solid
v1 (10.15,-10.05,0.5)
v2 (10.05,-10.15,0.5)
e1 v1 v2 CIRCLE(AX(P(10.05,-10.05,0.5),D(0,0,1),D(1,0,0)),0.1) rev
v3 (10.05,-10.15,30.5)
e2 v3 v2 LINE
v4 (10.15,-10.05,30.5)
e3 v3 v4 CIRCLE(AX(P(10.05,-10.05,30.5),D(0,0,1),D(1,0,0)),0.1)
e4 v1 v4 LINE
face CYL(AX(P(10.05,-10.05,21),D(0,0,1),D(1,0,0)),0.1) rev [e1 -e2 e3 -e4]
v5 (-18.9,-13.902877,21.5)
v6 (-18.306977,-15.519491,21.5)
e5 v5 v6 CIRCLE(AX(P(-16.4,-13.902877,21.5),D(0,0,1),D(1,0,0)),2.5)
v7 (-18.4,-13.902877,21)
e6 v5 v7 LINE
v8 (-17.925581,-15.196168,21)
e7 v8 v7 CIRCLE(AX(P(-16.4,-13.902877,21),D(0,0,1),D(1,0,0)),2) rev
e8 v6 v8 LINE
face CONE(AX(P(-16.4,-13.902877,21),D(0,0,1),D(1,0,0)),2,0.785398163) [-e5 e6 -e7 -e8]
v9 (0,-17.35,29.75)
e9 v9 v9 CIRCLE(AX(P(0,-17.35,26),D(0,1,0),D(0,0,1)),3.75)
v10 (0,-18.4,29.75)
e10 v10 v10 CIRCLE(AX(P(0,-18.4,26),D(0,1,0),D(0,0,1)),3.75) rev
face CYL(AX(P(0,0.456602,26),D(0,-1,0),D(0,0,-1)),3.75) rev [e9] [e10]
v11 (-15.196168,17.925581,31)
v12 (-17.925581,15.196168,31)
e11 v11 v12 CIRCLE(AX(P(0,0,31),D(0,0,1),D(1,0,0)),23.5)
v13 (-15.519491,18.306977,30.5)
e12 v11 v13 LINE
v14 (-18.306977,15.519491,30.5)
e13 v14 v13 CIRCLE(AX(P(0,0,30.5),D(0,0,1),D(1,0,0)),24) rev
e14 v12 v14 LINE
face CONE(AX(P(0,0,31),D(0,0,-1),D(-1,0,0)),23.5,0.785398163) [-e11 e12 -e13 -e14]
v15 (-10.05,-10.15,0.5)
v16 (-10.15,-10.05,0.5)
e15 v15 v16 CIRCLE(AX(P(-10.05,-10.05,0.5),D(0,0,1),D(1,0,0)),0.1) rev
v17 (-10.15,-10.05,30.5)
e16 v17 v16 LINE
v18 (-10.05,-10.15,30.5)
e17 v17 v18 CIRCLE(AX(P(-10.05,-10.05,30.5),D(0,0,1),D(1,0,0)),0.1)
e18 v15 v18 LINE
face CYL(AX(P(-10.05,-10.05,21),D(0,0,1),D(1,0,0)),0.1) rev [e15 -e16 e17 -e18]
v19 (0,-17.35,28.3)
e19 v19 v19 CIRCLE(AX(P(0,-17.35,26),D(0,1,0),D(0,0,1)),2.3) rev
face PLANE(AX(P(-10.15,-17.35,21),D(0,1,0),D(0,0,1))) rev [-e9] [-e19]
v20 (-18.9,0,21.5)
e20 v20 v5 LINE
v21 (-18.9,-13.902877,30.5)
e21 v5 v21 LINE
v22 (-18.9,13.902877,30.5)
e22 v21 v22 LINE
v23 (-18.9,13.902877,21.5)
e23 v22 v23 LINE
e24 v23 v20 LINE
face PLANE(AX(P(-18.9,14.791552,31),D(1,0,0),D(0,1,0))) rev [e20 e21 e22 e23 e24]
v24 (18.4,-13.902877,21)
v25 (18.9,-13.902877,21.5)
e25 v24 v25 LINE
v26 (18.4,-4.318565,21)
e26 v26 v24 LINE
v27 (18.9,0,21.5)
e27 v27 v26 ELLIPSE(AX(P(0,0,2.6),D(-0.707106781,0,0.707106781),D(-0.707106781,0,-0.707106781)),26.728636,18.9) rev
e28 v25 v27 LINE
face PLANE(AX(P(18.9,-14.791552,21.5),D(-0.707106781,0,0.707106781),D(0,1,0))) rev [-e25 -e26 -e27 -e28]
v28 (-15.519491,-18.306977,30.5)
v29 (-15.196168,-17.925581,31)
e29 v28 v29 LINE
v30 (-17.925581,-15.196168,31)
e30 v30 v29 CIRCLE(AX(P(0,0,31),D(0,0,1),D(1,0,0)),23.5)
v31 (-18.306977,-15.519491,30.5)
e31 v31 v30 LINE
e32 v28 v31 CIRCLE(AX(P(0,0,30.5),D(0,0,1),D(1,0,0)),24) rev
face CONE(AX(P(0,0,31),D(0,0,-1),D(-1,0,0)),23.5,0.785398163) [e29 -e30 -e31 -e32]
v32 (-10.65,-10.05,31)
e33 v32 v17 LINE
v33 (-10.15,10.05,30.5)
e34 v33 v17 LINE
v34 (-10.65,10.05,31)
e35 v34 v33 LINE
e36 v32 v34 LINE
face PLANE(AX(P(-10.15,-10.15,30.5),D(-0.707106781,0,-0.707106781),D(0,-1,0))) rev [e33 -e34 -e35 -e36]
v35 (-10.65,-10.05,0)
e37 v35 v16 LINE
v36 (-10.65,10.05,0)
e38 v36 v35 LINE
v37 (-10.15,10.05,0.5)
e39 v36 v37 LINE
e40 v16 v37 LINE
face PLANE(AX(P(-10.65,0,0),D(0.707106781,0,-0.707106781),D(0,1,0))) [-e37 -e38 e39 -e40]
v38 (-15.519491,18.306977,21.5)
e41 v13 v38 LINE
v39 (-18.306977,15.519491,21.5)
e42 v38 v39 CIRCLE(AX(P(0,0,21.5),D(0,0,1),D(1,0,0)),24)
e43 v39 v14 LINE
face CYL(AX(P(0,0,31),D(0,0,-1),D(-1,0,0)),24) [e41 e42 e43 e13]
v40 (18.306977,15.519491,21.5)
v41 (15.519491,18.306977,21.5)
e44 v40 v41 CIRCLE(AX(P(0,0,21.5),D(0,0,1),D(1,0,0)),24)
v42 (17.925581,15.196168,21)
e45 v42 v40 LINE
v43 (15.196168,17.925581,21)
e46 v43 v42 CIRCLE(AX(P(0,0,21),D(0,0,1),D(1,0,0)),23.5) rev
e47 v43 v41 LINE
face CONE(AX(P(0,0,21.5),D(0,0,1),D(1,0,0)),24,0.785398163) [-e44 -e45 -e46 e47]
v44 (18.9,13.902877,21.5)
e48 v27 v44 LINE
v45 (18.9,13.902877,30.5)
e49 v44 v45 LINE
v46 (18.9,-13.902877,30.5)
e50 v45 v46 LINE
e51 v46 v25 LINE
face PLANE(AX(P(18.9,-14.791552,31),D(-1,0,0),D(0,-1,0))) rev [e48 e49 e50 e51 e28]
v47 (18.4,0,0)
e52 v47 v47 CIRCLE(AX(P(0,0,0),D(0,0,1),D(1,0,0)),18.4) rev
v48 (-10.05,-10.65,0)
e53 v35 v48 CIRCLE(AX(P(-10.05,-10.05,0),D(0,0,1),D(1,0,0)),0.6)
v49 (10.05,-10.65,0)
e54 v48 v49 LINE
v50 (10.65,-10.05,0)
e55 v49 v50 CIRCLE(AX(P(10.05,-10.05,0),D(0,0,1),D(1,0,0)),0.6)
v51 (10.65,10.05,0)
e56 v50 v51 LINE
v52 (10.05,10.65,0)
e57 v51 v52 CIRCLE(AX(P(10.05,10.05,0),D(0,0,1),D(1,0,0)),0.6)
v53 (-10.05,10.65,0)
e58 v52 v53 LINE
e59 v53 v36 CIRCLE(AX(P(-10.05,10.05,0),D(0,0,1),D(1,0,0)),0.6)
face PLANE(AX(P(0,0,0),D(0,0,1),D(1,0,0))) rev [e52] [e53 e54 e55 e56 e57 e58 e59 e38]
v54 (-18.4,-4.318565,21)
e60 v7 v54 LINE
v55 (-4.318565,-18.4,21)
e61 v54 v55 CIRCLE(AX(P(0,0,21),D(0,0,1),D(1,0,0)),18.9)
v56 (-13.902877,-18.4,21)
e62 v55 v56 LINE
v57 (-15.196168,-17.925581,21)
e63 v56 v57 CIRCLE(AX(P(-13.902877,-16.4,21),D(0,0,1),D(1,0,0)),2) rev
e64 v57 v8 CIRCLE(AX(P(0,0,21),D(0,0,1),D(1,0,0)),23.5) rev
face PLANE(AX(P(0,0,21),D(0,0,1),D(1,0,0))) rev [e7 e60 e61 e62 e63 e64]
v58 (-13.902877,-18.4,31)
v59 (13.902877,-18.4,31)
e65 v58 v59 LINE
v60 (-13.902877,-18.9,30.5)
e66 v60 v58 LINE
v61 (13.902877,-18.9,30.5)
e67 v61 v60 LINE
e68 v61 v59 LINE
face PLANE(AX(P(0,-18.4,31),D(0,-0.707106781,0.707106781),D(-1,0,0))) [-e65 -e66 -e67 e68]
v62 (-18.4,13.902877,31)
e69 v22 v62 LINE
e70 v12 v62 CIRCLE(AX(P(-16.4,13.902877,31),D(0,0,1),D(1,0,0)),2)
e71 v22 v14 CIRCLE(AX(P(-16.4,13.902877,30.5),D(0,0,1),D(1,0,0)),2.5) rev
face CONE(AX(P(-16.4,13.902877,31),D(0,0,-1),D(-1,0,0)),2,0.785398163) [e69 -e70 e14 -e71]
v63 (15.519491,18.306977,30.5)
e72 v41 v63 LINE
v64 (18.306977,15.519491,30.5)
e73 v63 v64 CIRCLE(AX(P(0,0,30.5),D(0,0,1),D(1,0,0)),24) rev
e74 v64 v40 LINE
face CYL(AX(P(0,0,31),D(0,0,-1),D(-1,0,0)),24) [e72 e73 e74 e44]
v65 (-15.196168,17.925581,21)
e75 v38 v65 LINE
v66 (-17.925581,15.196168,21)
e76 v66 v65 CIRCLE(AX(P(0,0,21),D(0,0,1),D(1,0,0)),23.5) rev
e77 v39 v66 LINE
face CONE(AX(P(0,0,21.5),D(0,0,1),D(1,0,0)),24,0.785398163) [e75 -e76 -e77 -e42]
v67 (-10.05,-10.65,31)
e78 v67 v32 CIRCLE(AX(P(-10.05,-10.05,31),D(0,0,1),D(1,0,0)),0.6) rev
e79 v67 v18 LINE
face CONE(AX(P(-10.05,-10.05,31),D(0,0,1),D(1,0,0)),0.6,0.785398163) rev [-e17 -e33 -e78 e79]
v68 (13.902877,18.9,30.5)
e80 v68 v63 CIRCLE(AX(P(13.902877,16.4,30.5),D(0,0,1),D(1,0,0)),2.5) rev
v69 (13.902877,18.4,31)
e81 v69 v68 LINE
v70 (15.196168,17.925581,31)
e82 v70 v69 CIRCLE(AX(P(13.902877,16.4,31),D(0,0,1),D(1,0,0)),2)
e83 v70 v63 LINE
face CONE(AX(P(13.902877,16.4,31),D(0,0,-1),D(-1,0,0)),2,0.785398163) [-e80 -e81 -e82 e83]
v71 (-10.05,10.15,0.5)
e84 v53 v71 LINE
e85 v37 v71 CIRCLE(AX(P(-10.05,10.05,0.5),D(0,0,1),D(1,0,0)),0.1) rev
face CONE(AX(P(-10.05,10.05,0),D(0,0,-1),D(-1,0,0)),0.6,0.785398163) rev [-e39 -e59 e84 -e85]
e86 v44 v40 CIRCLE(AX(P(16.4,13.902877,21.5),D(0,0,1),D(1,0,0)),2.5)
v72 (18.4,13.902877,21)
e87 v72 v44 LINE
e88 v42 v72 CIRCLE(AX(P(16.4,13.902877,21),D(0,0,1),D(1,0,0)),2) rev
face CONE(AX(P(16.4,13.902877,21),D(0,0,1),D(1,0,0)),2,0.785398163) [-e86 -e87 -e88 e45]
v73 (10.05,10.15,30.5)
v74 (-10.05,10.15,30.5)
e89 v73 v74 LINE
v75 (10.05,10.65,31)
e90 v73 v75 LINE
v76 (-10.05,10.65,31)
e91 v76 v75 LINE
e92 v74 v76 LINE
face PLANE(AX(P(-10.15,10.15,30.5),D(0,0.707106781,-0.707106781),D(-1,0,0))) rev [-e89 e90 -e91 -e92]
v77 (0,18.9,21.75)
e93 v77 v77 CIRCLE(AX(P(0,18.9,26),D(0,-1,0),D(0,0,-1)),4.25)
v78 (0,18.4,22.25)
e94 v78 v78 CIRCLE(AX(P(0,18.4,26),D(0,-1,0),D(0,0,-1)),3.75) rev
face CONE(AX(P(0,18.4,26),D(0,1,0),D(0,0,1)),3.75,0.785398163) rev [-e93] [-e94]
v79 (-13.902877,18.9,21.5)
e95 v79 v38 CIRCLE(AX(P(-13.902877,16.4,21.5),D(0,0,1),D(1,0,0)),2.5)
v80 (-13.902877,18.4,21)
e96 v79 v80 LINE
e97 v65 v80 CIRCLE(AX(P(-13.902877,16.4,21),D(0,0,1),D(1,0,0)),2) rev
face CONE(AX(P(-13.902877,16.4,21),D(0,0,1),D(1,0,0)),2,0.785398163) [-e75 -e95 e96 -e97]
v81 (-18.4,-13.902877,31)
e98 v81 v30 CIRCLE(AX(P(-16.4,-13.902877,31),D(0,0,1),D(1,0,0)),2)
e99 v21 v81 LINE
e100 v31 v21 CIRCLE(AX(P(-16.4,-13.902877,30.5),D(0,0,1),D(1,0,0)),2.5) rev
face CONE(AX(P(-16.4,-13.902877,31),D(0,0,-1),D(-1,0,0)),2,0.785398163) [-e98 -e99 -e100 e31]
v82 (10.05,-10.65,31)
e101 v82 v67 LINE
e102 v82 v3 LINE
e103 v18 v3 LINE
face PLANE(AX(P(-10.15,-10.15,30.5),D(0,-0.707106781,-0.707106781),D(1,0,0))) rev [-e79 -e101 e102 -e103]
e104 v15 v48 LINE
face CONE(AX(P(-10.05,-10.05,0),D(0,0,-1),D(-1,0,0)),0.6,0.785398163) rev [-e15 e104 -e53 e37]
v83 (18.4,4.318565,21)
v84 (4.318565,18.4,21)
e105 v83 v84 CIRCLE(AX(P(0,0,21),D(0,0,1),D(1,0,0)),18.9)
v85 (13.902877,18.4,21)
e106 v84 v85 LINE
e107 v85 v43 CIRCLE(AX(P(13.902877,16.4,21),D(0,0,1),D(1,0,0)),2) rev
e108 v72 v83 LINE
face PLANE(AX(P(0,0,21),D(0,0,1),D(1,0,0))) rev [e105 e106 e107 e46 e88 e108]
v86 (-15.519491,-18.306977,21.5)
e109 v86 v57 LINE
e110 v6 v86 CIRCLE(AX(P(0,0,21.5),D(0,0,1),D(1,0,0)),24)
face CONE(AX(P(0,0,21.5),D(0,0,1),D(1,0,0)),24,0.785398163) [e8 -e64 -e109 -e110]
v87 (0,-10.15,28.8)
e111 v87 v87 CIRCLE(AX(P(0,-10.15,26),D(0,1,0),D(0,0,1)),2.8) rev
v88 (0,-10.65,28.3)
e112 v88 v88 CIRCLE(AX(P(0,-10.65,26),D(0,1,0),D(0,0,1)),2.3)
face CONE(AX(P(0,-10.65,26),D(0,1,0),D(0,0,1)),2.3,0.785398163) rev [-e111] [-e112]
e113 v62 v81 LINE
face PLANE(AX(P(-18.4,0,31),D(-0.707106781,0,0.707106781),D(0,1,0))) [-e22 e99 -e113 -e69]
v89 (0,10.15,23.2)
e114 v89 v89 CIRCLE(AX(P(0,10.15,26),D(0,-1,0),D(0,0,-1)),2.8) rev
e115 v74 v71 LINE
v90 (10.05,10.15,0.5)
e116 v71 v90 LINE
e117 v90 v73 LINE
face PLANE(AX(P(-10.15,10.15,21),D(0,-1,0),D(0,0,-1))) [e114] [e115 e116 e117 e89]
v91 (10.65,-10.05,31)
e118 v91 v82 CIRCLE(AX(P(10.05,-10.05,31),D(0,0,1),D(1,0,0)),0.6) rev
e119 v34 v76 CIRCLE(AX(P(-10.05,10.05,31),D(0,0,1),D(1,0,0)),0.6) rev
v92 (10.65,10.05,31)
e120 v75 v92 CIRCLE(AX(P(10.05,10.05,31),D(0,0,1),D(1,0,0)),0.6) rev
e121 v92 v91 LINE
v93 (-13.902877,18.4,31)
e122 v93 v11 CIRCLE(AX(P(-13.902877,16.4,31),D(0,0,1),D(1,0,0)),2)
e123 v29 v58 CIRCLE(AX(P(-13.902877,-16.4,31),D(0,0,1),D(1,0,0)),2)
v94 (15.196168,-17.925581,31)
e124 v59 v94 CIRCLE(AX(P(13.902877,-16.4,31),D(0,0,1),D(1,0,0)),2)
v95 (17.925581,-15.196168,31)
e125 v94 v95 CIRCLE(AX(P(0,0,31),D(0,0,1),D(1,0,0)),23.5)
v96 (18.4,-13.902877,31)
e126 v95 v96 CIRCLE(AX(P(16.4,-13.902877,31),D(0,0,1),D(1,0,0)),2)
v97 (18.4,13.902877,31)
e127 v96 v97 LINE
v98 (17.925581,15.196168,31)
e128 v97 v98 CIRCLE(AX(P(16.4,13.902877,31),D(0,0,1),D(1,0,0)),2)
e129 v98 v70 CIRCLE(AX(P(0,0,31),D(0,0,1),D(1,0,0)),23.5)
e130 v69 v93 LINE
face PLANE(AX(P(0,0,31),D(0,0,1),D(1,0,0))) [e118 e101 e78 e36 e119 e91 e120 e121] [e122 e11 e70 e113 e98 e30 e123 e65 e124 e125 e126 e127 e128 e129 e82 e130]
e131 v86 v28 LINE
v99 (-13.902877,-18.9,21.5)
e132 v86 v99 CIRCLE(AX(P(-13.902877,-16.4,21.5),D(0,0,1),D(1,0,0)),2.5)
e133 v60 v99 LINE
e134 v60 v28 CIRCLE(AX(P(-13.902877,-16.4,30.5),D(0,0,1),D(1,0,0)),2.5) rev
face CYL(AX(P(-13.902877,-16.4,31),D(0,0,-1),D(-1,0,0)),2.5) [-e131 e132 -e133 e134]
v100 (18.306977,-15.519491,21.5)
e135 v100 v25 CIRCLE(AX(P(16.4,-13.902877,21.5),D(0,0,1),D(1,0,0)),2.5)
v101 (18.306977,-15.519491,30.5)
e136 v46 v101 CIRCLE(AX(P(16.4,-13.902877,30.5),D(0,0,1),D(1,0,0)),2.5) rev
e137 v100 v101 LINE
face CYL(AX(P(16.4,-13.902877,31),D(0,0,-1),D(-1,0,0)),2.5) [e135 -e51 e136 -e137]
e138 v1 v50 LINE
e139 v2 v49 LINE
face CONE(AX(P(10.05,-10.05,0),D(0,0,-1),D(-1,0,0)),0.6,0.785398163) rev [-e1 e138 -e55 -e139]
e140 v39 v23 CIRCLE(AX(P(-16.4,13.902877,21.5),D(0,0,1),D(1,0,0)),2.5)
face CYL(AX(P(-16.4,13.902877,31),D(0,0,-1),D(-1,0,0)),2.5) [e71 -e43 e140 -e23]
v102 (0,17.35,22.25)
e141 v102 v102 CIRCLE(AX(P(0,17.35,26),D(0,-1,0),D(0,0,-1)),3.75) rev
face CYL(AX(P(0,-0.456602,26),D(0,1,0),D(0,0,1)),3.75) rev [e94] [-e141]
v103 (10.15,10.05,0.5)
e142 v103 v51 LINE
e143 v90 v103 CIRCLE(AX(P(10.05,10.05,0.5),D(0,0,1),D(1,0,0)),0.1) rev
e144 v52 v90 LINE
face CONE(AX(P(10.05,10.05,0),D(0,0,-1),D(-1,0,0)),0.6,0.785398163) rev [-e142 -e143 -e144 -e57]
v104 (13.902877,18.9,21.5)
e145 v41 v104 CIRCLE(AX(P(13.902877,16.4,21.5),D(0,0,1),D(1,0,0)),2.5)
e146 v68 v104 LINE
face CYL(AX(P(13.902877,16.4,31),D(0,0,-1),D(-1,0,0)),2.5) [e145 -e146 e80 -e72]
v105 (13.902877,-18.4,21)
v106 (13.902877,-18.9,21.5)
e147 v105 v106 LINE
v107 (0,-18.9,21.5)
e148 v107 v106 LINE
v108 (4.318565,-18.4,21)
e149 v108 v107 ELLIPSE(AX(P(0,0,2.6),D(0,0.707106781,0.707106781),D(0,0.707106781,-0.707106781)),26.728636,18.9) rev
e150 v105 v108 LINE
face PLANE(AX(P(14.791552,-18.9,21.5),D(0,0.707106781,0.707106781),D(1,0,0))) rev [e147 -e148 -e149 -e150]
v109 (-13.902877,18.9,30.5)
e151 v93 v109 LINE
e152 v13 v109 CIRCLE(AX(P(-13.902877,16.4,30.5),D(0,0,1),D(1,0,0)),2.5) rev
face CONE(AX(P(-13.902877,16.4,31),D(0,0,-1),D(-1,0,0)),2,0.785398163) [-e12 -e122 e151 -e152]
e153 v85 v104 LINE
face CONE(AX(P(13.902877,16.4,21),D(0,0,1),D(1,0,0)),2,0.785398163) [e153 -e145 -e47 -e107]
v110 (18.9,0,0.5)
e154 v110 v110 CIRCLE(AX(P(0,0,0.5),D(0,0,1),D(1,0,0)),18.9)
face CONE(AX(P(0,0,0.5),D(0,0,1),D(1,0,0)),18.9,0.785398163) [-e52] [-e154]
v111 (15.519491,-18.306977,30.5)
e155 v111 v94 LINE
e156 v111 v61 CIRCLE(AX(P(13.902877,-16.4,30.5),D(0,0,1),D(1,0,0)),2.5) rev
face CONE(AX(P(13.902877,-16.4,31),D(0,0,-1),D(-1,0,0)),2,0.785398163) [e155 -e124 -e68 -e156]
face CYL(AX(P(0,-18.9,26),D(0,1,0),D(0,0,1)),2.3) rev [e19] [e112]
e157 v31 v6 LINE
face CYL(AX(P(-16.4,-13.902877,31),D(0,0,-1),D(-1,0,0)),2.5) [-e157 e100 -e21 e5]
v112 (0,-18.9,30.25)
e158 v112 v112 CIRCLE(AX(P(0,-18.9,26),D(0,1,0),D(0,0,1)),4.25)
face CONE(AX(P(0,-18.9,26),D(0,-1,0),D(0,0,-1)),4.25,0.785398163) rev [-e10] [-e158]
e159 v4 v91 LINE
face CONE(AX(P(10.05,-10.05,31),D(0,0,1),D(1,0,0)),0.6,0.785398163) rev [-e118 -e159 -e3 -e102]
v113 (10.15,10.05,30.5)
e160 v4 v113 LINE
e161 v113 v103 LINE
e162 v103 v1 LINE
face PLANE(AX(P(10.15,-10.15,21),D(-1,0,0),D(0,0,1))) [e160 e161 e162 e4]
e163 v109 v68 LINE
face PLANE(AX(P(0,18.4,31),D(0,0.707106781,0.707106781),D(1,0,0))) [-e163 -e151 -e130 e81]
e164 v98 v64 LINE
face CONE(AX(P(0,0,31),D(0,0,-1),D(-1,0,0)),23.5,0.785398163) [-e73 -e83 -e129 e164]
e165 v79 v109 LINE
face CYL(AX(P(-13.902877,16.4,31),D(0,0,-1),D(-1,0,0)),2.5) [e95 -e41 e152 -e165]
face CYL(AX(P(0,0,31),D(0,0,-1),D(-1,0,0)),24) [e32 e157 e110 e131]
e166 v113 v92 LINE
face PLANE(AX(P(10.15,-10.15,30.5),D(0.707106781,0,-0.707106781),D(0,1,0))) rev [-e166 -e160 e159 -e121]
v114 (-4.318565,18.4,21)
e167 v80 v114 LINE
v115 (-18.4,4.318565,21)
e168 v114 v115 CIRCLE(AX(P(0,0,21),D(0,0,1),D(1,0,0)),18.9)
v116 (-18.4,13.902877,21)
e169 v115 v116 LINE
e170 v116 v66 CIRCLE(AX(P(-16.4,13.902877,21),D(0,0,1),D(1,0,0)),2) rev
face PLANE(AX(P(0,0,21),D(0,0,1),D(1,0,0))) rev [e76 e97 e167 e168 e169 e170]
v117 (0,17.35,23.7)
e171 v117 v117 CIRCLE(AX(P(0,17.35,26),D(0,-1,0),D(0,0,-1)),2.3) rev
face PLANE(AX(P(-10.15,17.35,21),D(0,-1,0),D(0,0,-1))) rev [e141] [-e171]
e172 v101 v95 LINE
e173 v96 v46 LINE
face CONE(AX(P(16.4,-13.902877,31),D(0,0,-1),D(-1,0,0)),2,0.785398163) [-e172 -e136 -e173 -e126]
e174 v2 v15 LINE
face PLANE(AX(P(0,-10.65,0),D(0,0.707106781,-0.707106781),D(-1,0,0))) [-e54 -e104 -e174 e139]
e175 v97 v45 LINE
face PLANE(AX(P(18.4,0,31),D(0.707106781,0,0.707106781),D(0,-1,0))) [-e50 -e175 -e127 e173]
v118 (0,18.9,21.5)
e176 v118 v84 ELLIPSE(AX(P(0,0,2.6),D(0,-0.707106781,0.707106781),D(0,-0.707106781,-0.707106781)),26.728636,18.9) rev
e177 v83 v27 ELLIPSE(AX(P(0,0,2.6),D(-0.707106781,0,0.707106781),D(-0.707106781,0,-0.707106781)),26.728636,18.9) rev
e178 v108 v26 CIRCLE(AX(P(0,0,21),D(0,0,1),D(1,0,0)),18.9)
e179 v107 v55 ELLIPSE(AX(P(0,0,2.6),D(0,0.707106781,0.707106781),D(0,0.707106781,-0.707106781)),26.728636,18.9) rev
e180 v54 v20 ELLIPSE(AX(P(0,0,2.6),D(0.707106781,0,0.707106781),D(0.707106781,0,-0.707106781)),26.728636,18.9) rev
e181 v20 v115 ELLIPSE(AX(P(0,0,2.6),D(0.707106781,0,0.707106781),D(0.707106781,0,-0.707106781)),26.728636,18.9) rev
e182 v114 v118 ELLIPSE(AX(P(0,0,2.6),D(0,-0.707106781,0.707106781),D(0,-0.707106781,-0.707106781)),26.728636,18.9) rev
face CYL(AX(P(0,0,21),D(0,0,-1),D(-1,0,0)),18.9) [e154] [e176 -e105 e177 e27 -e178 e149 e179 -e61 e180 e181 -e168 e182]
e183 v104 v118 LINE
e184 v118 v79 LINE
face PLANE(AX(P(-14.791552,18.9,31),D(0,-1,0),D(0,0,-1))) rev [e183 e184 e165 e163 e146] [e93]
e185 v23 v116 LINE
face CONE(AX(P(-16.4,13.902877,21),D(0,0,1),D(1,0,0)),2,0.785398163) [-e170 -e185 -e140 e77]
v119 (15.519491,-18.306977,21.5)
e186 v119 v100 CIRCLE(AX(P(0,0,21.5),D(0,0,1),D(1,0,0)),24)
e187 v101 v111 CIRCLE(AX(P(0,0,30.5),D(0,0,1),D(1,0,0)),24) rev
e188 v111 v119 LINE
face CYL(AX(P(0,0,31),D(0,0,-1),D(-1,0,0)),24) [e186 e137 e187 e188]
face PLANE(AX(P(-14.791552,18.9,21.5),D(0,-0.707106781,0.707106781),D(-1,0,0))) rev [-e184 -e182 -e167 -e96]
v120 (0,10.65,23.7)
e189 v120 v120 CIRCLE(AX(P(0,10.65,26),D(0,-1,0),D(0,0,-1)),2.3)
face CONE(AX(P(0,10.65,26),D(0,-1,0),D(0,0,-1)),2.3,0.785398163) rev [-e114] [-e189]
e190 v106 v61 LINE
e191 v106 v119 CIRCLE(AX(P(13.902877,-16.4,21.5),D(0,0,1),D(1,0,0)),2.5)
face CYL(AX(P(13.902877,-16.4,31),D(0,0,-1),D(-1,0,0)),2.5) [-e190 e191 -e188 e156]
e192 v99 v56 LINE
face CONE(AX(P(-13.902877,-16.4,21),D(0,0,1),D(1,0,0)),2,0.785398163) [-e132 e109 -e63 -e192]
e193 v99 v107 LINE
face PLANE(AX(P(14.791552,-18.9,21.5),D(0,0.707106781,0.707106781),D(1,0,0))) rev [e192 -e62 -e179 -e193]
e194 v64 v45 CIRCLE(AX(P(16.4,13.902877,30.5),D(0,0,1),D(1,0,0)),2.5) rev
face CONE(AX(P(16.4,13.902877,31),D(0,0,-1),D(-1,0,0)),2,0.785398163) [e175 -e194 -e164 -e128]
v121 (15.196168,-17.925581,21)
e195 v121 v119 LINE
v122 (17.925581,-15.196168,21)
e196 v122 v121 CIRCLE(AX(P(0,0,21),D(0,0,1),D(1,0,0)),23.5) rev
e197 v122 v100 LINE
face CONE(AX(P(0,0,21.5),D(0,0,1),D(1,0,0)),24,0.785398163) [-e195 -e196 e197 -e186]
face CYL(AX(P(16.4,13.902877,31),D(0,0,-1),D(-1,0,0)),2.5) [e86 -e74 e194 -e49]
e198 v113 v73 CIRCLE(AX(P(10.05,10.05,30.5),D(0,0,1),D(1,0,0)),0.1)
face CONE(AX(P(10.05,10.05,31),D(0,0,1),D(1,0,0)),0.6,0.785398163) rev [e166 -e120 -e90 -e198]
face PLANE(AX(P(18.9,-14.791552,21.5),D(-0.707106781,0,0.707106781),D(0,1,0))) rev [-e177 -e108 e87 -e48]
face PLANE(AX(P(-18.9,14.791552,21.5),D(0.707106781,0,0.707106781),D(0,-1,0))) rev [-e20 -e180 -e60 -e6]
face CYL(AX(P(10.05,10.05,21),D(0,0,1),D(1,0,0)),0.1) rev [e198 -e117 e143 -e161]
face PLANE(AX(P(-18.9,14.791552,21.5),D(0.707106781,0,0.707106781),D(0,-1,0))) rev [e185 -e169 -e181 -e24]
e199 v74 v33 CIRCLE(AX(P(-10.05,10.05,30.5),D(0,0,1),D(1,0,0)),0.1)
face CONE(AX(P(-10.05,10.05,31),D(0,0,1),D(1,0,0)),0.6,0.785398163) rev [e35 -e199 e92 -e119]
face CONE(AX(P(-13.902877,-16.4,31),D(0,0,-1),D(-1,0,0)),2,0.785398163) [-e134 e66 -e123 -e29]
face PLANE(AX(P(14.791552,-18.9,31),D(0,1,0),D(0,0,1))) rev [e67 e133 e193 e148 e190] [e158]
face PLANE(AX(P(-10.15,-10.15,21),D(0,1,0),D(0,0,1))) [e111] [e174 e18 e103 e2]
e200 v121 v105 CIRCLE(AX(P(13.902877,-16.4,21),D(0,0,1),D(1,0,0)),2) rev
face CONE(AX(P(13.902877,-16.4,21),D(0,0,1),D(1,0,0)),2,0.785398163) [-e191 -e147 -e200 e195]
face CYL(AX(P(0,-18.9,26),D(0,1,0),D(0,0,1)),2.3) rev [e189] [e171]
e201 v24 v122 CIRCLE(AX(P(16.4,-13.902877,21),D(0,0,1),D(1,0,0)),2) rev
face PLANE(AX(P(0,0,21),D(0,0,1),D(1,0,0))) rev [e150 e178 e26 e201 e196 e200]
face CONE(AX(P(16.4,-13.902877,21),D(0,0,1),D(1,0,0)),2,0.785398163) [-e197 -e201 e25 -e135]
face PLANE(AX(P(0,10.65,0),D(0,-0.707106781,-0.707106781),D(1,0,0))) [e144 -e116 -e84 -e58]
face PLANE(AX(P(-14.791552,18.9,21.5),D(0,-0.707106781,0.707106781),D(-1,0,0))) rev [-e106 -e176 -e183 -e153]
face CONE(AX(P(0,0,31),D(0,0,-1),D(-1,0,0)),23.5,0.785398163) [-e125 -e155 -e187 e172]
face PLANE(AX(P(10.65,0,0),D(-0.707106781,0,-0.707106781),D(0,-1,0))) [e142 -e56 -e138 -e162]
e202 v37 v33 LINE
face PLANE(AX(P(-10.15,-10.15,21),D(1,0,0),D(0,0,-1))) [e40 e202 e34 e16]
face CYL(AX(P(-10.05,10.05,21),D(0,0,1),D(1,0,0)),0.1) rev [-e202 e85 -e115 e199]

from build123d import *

# Parameters (mm, degrees)
SKIZZE1_R                       = 18.9
SKIZZE1_W                       = 20.3
SKIZZE1_H                       = 20.3
AUFSATZ_LINEAR_AUSTRAGEN1_DEPTH = 21
SKIZZE2_W                       = 20.3
SKIZZE2_H                       = 20.3
AUFSATZ_LINEAR_AUSTRAGEN2_DEPTH = 10
SKIZZE3_R                       = 2.3
SCHNITT_LINEAR_AUSTRAGEN1_DEPTH = 53.412307715
SKETCH1_R                       = 3.75
CUT_EXTRUDE1_DEPTH              = 1.55
CUT_EXTRUDE2_START              = -36.25
SKETCH1_2_R                     = 3.75
CUT_EXTRUDE2_DEPTH              = 1.55
VERRUNDUNG1_R                   = 0.1
VERRUNDUNG2_R                   = 2.5
FASE1_SIZE                      = 0.5
FASE4_SIZE                      = 0.5


with BuildPart() as part:
    # Skizze1 → Aufsatz-Linear austragen1 (new body)
    with BuildSketch(Plane.XY):
        with Locations(Location((0, 0, 0), (0, 0, 180))):
            Circle(SKIZZE1_R)
        Rectangle(SKIZZE1_W, SKIZZE1_H, mode=Mode.SUBTRACT)
    extrude(amount=AUFSATZ_LINEAR_AUSTRAGEN1_DEPTH)

    # Skizze2 → Aufsatz-Linear austragen2 (add)
    with BuildSketch(Plane.XY.offset(21)):
        with BuildLine():
            Line((-14.791551643, 18.9), (14.791551643, 18.9))
            ThreePointArc((14.791551643, 18.9), (16.970562748, 16.970562748), (18.9, 14.791551643))
            Line((18.9, 14.791551643), (18.9, -14.791551643))
            ThreePointArc((18.9, -14.791551643), (16.970562748, -16.970562748), (14.791551643, -18.9))
            Line((14.791551643, -18.9), (-14.791551643, -18.9))
            ThreePointArc((-14.791551643, -18.9), (-16.970562748, -16.970562748), (-18.9, -14.791551643))
            Line((-18.9, -14.791551643), (-18.9, 14.791551643))
            ThreePointArc((-18.9, 14.791551643), (-16.970562748, 16.970562748), (-14.791551643, 18.9))
        make_face()
        Rectangle(SKIZZE2_W, SKIZZE2_H, mode=Mode.SUBTRACT)
    extrude(amount=AUFSATZ_LINEAR_AUSTRAGEN2_DEPTH)

    # Skizze3 → Schnitt-Linear austragen1 (cut, through all)
    with BuildSketch(Plane(origin=(0, 18.9, 0), x_dir=(1, 0, 0), z_dir=(0, 1, 0))):
        with Locations(Location((0, -26, 0), (0, 0, 270))):
            Circle(SKIZZE3_R)
    extrude(amount=-SCHNITT_LINEAR_AUSTRAGEN1_DEPTH, mode=Mode.SUBTRACT)

    # Sketch1 → Cut-Extrude1 (cut)
    with BuildSketch(Plane(origin=(0, 18.9, 0), x_dir=(1, 0, 0), z_dir=(0, 1, 0))):
        with Locations(Location((0, -26, 0), (0, 0, 270))):
            Circle(SKETCH1_R)
    extrude(amount=-CUT_EXTRUDE1_DEPTH, mode=Mode.SUBTRACT)

    # Sketch1<2> → Cut-Extrude2 (cut)
    with BuildSketch(Plane(origin=(0, 18.9, 0), x_dir=(1, 0, 0), z_dir=(0, 1, 0)).offset(CUT_EXTRUDE2_START)):
        with Locations(Location((0, -26, 0), (0, 0, 270))):
            Circle(SKETCH1_2_R)
    extrude(amount=-CUT_EXTRUDE2_DEPTH, mode=Mode.SUBTRACT)

    # Verrundung1
    verrundung1_edges = [part.edges().sort_by_distance(p)[0] for p in [
        (10.15, -10.15, 15.5),
        (10.15, 10.15, 15.5),
        (-10.15, 10.15, 15.5),
        (-10.15, -10.15, 15.5),
    ]]
    fillet(verrundung1_edges, radius=VERRUNDUNG1_R)

    # Verrundung2
    verrundung2_edges = [part.edges().sort_by_distance(p)[0] for p in [
        (-14.791551643, 18.9, 26),
        (-18.9, 14.791551643, 26),
        (-18.9, -14.791551643, 26),
        (-14.791551643, -18.9, 26),
        (14.791551643, -18.9, 26),
        (18.9, -14.791551643, 26),
        (18.9, 14.791551643, 26),
        (14.791551643, 18.9, 26),
    ]]
    fillet(verrundung2_edges, radius=VERRUNDUNG2_R)

    # Fase1
    fase1_edges = [part.edges().sort_by_distance(p)[0] for p in [
        (-16.970562748, -16.970562748, 31),
        (-18.9, 0, 31),
        (-16.970562748, 16.970562748, 31),
        (0, -18.9, 31),
        (16.970562748, -16.970562748, 31),
        (18.9, 0, 31),
        (16.970562748, 16.970562748, 31),
        (0, 18.9, 31),
        (-14.76385305, 18.747066452, 31),
        (-18.747066452, 14.76385305, 31),
        (14.76385305, 18.747066452, 31),
        (18.747066452, 14.76385305, 31),
        (18.747066452, -14.76385305, 31),
        (14.76385305, -18.747066452, 31),
        (-14.76385305, -18.747066452, 31),
        (-18.747066452, -14.76385305, 31),
        (18.9, 0, 0),
        (0, -10.15, 23.7),
        (0, 10.15, 23.7),
        (0, 18.9, 22.25),
        (0, -18.9, 22.25),
        (0, -10.15, 0),
        (0, -10.15, 31),
        (10.15, 0, 0),
        (10.15, 0, 31),
        (-10.15, 0, 0),
        (-10.15, 0, 31),
        (0, 10.15, 0),
        (0, 10.15, 31),
        (10.120710678, -10.120710678, 0),
        (10.120710678, -10.120710678, 31),
        (-10.120710678, -10.120710678, 0),
        (-10.120710678, -10.120710678, 31),
        (-10.120710678, 10.120710678, 0),
        (-10.120710678, 10.120710678, 31),
        (10.120710678, 10.120710678, 0),
        (10.120710678, 10.120710678, 31),
    ]]
    chamfer(fase1_edges, length=FASE1_SIZE)

    # Fase4
    # the kernel refuses this chamfer: 0.5 mm, written as the material it takes off along each edge
    with BuildSketch(Plane(origin=(0, 0, 21), x_dir=(-0.6466454604660656, -0.762790697674421, 0), z_dir=(0.762790697674421, -0.6466454604660656, 0))) as fase4_piece_1:
        Polygon((24, -FASE4_SIZE), (24 - FASE4_SIZE, 0), (24, 0), align=None)
    revolve(axis=Axis((0, 0, 21), (0, 0, -1)), revolution_arc=9.421682318, mode=Mode.SUBTRACT)
    with BuildSketch(Plane(origin=(0, -18.9, 21), x_dir=(0, -0.027495876610589005, 0.9996219169112968), z_dir=(-1, 0, 0))) as fase4_piece_2_section:
        Polygon((FASE4_SIZE * 0.999621916911, FASE4_SIZE * 0.0274958766106), (-FASE4_SIZE * 0.0274958766106, FASE4_SIZE * 0.999621916911), (0, 0), align=None)
    fase4_piece_2 = extrude(amount=13.9028774, mode=Mode.PRIVATE)
    fase4_piece_2 = fase4_piece_2 - Plane(origin=(0, 0, 21.173530337), x_dir=(-1, 0, 0), z_dir=(0, 0, -1)) * Cylinder(18.9, 30, mode=Mode.PRIVATE)
    add(fase4_piece_2, mode=Mode.SUBTRACT)
    with BuildSketch(Plane(origin=(-13.9028774, -16.4, 21), x_dir=(0, -1, 0), z_dir=(1, 0, 0))) as fase4_piece_3:
        Polygon((2.5, -FASE4_SIZE), (2.5 - FASE4_SIZE, 0), (2.5, 0), align=None)
    revolve(axis=Axis((-13.9028774, -16.4, 21), (0, 0, -1)), revolution_arc=40.289158841, mode=Mode.SUBTRACT)
    with BuildSketch(Plane(origin=(-16.4, -13.9028774, 21), x_dir=(-0.7627906976744183, -0.6466454604660687, 0), z_dir=(0.6466454604660687, -0.7627906976744183, 0))) as fase4_piece_4:
        Polygon((2.5, -FASE4_SIZE), (2.5 - FASE4_SIZE, 0), (2.5, 0), align=None)
    revolve(axis=Axis((-16.4, -13.9028774, 21), (0, 0, -1)), revolution_arc=40.289158841, mode=Mode.SUBTRACT)
    with BuildSketch(Plane(origin=(-18.9, 0, 21), x_dir=(-0.027495876610589005, 0, 0.9996219169112968), z_dir=(0, 1, 0))) as fase4_piece_5_section:
        Polygon((FASE4_SIZE * 0.999621916911, FASE4_SIZE * 0.0274958766106), (-FASE4_SIZE * 0.0274958766106, FASE4_SIZE * 0.999621916911), (0, 0), align=None)
    fase4_piece_5 = extrude(amount=13.9028774, mode=Mode.PRIVATE)
    fase4_piece_5 = fase4_piece_5 - Plane(origin=(0, 0, 21.173530342), x_dir=(-1, 0, 0), z_dir=(0, 0, -1)) * Cylinder(18.9, 30, mode=Mode.PRIVATE)
    add(fase4_piece_5, mode=Mode.SUBTRACT)
    with BuildSketch(Plane(origin=(0, 0, 21), x_dir=(0.7627906976744181, -0.646645460466069, 0), z_dir=(0.646645460466069, 0.7627906976744181, 0))) as fase4_piece_6:
        Polygon((24, -FASE4_SIZE), (24 - FASE4_SIZE, 0), (24, 0), align=None)
    revolve(axis=Axis((0, 0, 21), (0, 0, -1)), revolution_arc=9.421682318, mode=Mode.SUBTRACT)
    with BuildSketch(Plane(origin=(18.9, -8.6e-08, 21), x_dir=(0.027495876610589005, 0, 0.9996219169112968), z_dir=(0, -1, 0))) as fase4_piece_7_section:
        Polygon((FASE4_SIZE * 0.999621916911, FASE4_SIZE * 0.0274958766106), (-FASE4_SIZE * 0.0274958766106, FASE4_SIZE * 0.999621916911), (0, 0), align=None)
    fase4_piece_7 = extrude(amount=13.902877314, mode=Mode.PRIVATE)
    fase4_piece_7 = fase4_piece_7 - Plane(origin=(0, 0, 21.173530337), x_dir=(-1, 0, 0), z_dir=(0, 0, -1)) * Cylinder(18.9, 30, mode=Mode.PRIVATE)
    add(fase4_piece_7, mode=Mode.SUBTRACT)
    with BuildSketch(Plane(origin=(16.4, -13.9028774, 21), x_dir=(1, 0, 0), z_dir=(0, 1, 0))) as fase4_piece_8:
        Polygon((2.5, -FASE4_SIZE), (2.5 - FASE4_SIZE, 0), (2.5, 0), align=None)
    revolve(axis=Axis((16.4, -13.9028774, 21), (0, 0, -1)), revolution_arc=40.289158841, mode=Mode.SUBTRACT)
    with BuildSketch(Plane(origin=(13.9028774, -16.4, 21), x_dir=(0.64664546046607, -0.7627906976744174, 0), z_dir=(0.7627906976744174, 0.64664546046607, 0))) as fase4_piece_9:
        Polygon((2.5, -FASE4_SIZE), (2.5 - FASE4_SIZE, 0), (2.5, 0), align=None)
    revolve(axis=Axis((13.9028774, -16.4, 21), (0, 0, -1)), revolution_arc=40.289158841, mode=Mode.SUBTRACT)
    with BuildSketch(Plane(origin=(0, 0, 21), x_dir=(0.6466454604660691, 0.762790697674418, 0), z_dir=(-0.762790697674418, 0.6466454604660691, 0))) as fase4_piece_10:
        Polygon((24, -FASE4_SIZE), (24 - FASE4_SIZE, 0), (24, 0), align=None)
    revolve(axis=Axis((0, 0, 21), (0, 0, -1)), revolution_arc=9.421682318, mode=Mode.SUBTRACT)
    with BuildSketch(Plane(origin=(2.2e-08, 18.9, 21), x_dir=(0, 0.027495876610589005, 0.9996219169112968), z_dir=(1, 0, 0))) as fase4_piece_11_section:
        Polygon((FASE4_SIZE * 0.999621916911, FASE4_SIZE * 0.0274958766106), (-FASE4_SIZE * 0.0274958766106, FASE4_SIZE * 0.999621916911), (0, 0), align=None)
    fase4_piece_11 = extrude(amount=13.902877378, mode=Mode.PRIVATE)
    fase4_piece_11 = fase4_piece_11 - Plane(origin=(0, 0, 21.173530337), x_dir=(-1, 0, 0), z_dir=(0, 0, -1)) * Cylinder(18.9, 30, mode=Mode.PRIVATE)
    add(fase4_piece_11, mode=Mode.SUBTRACT)
    with BuildSketch(Plane(origin=(13.9028774, 16.4, 21), x_dir=(0, 1, 0), z_dir=(-1, 0, 0))) as fase4_piece_12:
        Polygon((2.5, -FASE4_SIZE), (2.5 - FASE4_SIZE, 0), (2.5, 0), align=None)
    revolve(axis=Axis((13.9028774, 16.4, 21), (0, 0, -1)), revolution_arc=40.289158841, mode=Mode.SUBTRACT)
    with BuildSketch(Plane(origin=(16.4, 13.9028774, 21), x_dir=(0.7627906976744174, 0.64664546046607, 0), z_dir=(-0.64664546046607, 0.7627906976744174, 0))) as fase4_piece_13:
        Polygon((2.5, -FASE4_SIZE), (2.5 - FASE4_SIZE, 0), (2.5, 0), align=None)
    revolve(axis=Axis((16.4, 13.9028774, 21), (0, 0, -1)), revolution_arc=40.289158841, mode=Mode.SUBTRACT)
    with BuildSketch(Plane(origin=(0, 0, 21), x_dir=(-0.7627906976744193, 0.6466454604660676, 0), z_dir=(-0.6466454604660676, -0.7627906976744193, 0))) as fase4_piece_14:
        Polygon((24, -FASE4_SIZE), (24 - FASE4_SIZE, 0), (24, 0), align=None)
    revolve(axis=Axis((0, 0, 21), (0, 0, -1)), revolution_arc=9.421682318, mode=Mode.SUBTRACT)
    with BuildSketch(Plane(origin=(-13.9028774, 16.4, 21), x_dir=(0, 1, 0), z_dir=(1, 0, 0))) as fase4_piece_15:
        Polygon((2.5, FASE4_SIZE), (2.5 - FASE4_SIZE, 0), (2.5, 0), align=None)
    revolve(axis=Axis((-13.9028774, 16.4, 21), (0, 0, 1)), revolution_arc=40.289158841, mode=Mode.SUBTRACT)
    with BuildSketch(Plane(origin=(-16.4, 13.9028774, 21), x_dir=(-1, 0, 0), z_dir=(0, -1, 0))) as fase4_piece_16:
        Polygon((2.5, -FASE4_SIZE), (2.5 - FASE4_SIZE, 0), (2.5, 0), align=None)
    revolve(axis=Axis((-16.4, 13.9028774, 21), (0, 0, -1)), revolution_arc=40.289158841, mode=Mode.SUBTRACT)
    with BuildSketch(Plane(origin=(-18.9, -13.9028774, 21), x_dir=(-0.027495876610589005, 0, 0.9996219169112968), z_dir=(0, 1, 0))) as fase4_piece_17_section:
        Polygon((FASE4_SIZE * 0.999621916911, FASE4_SIZE * 0.0274958766106), (-FASE4_SIZE * 0.0274958766106, FASE4_SIZE * 0.999621916911), (0, 0), align=None)
    fase4_piece_17 = extrude(amount=13.9028774, mode=Mode.PRIVATE)
    fase4_piece_17 = fase4_piece_17 - Plane(origin=(0, 0, 21.173530332), x_dir=(-1, 0, 0), z_dir=(0, 0, -1)) * Cylinder(18.9, 30, mode=Mode.PRIVATE)
    add(fase4_piece_17, mode=Mode.SUBTRACT)
    with BuildSketch(Plane(origin=(13.9028774, -18.9, 21), x_dir=(0, -0.027495876610589005, 0.9996219169112968), z_dir=(-1, 0, 0))) as fase4_piece_18_section:
        Polygon((FASE4_SIZE * 0.999621916911, FASE4_SIZE * 0.0274958766106), (-FASE4_SIZE * 0.0274958766106, FASE4_SIZE * 0.999621916911), (0, 0), align=None)
    fase4_piece_18 = extrude(amount=13.9028774, mode=Mode.PRIVATE)
    fase4_piece_18 = fase4_piece_18 - Plane(origin=(0, 0, 21.173530332), x_dir=(-1, 0, 0), z_dir=(0, 0, -1)) * Cylinder(18.9, 30, mode=Mode.PRIVATE)
    add(fase4_piece_18, mode=Mode.SUBTRACT)
    with BuildSketch(Plane(origin=(18.9, 13.9028774, 21), x_dir=(0.027495876610589005, 0, 0.9996219169112968), z_dir=(0, -1, 0))) as fase4_piece_19_section:
        Polygon((FASE4_SIZE * 0.999621916911, FASE4_SIZE * 0.0274958766106), (-FASE4_SIZE * 0.0274958766106, FASE4_SIZE * 0.999621916911), (0, 0), align=None)
    fase4_piece_19 = extrude(amount=13.902877486, mode=Mode.PRIVATE)
    fase4_piece_19 = fase4_piece_19 - Plane(origin=(0, 0, 21.173530332), x_dir=(-1, 0, 0), z_dir=(0, 0, -1)) * Cylinder(18.9, 30, mode=Mode.PRIVATE)
    add(fase4_piece_19, mode=Mode.SUBTRACT)
    with BuildSketch(Plane(origin=(-13.9028774, 18.9, 21), x_dir=(0, 0.027495876610589005, 0.9996219169112968), z_dir=(1, 0, 0))) as fase4_piece_20_section:
        Polygon((FASE4_SIZE * 0.999621916911, FASE4_SIZE * 0.0274958766106), (-FASE4_SIZE * 0.0274958766106, FASE4_SIZE * 0.999621916911), (0, 0), align=None)
    fase4_piece_20 = extrude(amount=13.902877422, mode=Mode.PRIVATE)
    fase4_piece_20 = fase4_piece_20 - Plane(origin=(0, 0, 21.173530342), x_dir=(-1, 0, 0), z_dir=(0, 0, -1)) * Cylinder(18.9, 30, mode=Mode.PRIVATE)
    add(fase4_piece_20, mode=Mode.SUBTRACT)


solid = part.part
